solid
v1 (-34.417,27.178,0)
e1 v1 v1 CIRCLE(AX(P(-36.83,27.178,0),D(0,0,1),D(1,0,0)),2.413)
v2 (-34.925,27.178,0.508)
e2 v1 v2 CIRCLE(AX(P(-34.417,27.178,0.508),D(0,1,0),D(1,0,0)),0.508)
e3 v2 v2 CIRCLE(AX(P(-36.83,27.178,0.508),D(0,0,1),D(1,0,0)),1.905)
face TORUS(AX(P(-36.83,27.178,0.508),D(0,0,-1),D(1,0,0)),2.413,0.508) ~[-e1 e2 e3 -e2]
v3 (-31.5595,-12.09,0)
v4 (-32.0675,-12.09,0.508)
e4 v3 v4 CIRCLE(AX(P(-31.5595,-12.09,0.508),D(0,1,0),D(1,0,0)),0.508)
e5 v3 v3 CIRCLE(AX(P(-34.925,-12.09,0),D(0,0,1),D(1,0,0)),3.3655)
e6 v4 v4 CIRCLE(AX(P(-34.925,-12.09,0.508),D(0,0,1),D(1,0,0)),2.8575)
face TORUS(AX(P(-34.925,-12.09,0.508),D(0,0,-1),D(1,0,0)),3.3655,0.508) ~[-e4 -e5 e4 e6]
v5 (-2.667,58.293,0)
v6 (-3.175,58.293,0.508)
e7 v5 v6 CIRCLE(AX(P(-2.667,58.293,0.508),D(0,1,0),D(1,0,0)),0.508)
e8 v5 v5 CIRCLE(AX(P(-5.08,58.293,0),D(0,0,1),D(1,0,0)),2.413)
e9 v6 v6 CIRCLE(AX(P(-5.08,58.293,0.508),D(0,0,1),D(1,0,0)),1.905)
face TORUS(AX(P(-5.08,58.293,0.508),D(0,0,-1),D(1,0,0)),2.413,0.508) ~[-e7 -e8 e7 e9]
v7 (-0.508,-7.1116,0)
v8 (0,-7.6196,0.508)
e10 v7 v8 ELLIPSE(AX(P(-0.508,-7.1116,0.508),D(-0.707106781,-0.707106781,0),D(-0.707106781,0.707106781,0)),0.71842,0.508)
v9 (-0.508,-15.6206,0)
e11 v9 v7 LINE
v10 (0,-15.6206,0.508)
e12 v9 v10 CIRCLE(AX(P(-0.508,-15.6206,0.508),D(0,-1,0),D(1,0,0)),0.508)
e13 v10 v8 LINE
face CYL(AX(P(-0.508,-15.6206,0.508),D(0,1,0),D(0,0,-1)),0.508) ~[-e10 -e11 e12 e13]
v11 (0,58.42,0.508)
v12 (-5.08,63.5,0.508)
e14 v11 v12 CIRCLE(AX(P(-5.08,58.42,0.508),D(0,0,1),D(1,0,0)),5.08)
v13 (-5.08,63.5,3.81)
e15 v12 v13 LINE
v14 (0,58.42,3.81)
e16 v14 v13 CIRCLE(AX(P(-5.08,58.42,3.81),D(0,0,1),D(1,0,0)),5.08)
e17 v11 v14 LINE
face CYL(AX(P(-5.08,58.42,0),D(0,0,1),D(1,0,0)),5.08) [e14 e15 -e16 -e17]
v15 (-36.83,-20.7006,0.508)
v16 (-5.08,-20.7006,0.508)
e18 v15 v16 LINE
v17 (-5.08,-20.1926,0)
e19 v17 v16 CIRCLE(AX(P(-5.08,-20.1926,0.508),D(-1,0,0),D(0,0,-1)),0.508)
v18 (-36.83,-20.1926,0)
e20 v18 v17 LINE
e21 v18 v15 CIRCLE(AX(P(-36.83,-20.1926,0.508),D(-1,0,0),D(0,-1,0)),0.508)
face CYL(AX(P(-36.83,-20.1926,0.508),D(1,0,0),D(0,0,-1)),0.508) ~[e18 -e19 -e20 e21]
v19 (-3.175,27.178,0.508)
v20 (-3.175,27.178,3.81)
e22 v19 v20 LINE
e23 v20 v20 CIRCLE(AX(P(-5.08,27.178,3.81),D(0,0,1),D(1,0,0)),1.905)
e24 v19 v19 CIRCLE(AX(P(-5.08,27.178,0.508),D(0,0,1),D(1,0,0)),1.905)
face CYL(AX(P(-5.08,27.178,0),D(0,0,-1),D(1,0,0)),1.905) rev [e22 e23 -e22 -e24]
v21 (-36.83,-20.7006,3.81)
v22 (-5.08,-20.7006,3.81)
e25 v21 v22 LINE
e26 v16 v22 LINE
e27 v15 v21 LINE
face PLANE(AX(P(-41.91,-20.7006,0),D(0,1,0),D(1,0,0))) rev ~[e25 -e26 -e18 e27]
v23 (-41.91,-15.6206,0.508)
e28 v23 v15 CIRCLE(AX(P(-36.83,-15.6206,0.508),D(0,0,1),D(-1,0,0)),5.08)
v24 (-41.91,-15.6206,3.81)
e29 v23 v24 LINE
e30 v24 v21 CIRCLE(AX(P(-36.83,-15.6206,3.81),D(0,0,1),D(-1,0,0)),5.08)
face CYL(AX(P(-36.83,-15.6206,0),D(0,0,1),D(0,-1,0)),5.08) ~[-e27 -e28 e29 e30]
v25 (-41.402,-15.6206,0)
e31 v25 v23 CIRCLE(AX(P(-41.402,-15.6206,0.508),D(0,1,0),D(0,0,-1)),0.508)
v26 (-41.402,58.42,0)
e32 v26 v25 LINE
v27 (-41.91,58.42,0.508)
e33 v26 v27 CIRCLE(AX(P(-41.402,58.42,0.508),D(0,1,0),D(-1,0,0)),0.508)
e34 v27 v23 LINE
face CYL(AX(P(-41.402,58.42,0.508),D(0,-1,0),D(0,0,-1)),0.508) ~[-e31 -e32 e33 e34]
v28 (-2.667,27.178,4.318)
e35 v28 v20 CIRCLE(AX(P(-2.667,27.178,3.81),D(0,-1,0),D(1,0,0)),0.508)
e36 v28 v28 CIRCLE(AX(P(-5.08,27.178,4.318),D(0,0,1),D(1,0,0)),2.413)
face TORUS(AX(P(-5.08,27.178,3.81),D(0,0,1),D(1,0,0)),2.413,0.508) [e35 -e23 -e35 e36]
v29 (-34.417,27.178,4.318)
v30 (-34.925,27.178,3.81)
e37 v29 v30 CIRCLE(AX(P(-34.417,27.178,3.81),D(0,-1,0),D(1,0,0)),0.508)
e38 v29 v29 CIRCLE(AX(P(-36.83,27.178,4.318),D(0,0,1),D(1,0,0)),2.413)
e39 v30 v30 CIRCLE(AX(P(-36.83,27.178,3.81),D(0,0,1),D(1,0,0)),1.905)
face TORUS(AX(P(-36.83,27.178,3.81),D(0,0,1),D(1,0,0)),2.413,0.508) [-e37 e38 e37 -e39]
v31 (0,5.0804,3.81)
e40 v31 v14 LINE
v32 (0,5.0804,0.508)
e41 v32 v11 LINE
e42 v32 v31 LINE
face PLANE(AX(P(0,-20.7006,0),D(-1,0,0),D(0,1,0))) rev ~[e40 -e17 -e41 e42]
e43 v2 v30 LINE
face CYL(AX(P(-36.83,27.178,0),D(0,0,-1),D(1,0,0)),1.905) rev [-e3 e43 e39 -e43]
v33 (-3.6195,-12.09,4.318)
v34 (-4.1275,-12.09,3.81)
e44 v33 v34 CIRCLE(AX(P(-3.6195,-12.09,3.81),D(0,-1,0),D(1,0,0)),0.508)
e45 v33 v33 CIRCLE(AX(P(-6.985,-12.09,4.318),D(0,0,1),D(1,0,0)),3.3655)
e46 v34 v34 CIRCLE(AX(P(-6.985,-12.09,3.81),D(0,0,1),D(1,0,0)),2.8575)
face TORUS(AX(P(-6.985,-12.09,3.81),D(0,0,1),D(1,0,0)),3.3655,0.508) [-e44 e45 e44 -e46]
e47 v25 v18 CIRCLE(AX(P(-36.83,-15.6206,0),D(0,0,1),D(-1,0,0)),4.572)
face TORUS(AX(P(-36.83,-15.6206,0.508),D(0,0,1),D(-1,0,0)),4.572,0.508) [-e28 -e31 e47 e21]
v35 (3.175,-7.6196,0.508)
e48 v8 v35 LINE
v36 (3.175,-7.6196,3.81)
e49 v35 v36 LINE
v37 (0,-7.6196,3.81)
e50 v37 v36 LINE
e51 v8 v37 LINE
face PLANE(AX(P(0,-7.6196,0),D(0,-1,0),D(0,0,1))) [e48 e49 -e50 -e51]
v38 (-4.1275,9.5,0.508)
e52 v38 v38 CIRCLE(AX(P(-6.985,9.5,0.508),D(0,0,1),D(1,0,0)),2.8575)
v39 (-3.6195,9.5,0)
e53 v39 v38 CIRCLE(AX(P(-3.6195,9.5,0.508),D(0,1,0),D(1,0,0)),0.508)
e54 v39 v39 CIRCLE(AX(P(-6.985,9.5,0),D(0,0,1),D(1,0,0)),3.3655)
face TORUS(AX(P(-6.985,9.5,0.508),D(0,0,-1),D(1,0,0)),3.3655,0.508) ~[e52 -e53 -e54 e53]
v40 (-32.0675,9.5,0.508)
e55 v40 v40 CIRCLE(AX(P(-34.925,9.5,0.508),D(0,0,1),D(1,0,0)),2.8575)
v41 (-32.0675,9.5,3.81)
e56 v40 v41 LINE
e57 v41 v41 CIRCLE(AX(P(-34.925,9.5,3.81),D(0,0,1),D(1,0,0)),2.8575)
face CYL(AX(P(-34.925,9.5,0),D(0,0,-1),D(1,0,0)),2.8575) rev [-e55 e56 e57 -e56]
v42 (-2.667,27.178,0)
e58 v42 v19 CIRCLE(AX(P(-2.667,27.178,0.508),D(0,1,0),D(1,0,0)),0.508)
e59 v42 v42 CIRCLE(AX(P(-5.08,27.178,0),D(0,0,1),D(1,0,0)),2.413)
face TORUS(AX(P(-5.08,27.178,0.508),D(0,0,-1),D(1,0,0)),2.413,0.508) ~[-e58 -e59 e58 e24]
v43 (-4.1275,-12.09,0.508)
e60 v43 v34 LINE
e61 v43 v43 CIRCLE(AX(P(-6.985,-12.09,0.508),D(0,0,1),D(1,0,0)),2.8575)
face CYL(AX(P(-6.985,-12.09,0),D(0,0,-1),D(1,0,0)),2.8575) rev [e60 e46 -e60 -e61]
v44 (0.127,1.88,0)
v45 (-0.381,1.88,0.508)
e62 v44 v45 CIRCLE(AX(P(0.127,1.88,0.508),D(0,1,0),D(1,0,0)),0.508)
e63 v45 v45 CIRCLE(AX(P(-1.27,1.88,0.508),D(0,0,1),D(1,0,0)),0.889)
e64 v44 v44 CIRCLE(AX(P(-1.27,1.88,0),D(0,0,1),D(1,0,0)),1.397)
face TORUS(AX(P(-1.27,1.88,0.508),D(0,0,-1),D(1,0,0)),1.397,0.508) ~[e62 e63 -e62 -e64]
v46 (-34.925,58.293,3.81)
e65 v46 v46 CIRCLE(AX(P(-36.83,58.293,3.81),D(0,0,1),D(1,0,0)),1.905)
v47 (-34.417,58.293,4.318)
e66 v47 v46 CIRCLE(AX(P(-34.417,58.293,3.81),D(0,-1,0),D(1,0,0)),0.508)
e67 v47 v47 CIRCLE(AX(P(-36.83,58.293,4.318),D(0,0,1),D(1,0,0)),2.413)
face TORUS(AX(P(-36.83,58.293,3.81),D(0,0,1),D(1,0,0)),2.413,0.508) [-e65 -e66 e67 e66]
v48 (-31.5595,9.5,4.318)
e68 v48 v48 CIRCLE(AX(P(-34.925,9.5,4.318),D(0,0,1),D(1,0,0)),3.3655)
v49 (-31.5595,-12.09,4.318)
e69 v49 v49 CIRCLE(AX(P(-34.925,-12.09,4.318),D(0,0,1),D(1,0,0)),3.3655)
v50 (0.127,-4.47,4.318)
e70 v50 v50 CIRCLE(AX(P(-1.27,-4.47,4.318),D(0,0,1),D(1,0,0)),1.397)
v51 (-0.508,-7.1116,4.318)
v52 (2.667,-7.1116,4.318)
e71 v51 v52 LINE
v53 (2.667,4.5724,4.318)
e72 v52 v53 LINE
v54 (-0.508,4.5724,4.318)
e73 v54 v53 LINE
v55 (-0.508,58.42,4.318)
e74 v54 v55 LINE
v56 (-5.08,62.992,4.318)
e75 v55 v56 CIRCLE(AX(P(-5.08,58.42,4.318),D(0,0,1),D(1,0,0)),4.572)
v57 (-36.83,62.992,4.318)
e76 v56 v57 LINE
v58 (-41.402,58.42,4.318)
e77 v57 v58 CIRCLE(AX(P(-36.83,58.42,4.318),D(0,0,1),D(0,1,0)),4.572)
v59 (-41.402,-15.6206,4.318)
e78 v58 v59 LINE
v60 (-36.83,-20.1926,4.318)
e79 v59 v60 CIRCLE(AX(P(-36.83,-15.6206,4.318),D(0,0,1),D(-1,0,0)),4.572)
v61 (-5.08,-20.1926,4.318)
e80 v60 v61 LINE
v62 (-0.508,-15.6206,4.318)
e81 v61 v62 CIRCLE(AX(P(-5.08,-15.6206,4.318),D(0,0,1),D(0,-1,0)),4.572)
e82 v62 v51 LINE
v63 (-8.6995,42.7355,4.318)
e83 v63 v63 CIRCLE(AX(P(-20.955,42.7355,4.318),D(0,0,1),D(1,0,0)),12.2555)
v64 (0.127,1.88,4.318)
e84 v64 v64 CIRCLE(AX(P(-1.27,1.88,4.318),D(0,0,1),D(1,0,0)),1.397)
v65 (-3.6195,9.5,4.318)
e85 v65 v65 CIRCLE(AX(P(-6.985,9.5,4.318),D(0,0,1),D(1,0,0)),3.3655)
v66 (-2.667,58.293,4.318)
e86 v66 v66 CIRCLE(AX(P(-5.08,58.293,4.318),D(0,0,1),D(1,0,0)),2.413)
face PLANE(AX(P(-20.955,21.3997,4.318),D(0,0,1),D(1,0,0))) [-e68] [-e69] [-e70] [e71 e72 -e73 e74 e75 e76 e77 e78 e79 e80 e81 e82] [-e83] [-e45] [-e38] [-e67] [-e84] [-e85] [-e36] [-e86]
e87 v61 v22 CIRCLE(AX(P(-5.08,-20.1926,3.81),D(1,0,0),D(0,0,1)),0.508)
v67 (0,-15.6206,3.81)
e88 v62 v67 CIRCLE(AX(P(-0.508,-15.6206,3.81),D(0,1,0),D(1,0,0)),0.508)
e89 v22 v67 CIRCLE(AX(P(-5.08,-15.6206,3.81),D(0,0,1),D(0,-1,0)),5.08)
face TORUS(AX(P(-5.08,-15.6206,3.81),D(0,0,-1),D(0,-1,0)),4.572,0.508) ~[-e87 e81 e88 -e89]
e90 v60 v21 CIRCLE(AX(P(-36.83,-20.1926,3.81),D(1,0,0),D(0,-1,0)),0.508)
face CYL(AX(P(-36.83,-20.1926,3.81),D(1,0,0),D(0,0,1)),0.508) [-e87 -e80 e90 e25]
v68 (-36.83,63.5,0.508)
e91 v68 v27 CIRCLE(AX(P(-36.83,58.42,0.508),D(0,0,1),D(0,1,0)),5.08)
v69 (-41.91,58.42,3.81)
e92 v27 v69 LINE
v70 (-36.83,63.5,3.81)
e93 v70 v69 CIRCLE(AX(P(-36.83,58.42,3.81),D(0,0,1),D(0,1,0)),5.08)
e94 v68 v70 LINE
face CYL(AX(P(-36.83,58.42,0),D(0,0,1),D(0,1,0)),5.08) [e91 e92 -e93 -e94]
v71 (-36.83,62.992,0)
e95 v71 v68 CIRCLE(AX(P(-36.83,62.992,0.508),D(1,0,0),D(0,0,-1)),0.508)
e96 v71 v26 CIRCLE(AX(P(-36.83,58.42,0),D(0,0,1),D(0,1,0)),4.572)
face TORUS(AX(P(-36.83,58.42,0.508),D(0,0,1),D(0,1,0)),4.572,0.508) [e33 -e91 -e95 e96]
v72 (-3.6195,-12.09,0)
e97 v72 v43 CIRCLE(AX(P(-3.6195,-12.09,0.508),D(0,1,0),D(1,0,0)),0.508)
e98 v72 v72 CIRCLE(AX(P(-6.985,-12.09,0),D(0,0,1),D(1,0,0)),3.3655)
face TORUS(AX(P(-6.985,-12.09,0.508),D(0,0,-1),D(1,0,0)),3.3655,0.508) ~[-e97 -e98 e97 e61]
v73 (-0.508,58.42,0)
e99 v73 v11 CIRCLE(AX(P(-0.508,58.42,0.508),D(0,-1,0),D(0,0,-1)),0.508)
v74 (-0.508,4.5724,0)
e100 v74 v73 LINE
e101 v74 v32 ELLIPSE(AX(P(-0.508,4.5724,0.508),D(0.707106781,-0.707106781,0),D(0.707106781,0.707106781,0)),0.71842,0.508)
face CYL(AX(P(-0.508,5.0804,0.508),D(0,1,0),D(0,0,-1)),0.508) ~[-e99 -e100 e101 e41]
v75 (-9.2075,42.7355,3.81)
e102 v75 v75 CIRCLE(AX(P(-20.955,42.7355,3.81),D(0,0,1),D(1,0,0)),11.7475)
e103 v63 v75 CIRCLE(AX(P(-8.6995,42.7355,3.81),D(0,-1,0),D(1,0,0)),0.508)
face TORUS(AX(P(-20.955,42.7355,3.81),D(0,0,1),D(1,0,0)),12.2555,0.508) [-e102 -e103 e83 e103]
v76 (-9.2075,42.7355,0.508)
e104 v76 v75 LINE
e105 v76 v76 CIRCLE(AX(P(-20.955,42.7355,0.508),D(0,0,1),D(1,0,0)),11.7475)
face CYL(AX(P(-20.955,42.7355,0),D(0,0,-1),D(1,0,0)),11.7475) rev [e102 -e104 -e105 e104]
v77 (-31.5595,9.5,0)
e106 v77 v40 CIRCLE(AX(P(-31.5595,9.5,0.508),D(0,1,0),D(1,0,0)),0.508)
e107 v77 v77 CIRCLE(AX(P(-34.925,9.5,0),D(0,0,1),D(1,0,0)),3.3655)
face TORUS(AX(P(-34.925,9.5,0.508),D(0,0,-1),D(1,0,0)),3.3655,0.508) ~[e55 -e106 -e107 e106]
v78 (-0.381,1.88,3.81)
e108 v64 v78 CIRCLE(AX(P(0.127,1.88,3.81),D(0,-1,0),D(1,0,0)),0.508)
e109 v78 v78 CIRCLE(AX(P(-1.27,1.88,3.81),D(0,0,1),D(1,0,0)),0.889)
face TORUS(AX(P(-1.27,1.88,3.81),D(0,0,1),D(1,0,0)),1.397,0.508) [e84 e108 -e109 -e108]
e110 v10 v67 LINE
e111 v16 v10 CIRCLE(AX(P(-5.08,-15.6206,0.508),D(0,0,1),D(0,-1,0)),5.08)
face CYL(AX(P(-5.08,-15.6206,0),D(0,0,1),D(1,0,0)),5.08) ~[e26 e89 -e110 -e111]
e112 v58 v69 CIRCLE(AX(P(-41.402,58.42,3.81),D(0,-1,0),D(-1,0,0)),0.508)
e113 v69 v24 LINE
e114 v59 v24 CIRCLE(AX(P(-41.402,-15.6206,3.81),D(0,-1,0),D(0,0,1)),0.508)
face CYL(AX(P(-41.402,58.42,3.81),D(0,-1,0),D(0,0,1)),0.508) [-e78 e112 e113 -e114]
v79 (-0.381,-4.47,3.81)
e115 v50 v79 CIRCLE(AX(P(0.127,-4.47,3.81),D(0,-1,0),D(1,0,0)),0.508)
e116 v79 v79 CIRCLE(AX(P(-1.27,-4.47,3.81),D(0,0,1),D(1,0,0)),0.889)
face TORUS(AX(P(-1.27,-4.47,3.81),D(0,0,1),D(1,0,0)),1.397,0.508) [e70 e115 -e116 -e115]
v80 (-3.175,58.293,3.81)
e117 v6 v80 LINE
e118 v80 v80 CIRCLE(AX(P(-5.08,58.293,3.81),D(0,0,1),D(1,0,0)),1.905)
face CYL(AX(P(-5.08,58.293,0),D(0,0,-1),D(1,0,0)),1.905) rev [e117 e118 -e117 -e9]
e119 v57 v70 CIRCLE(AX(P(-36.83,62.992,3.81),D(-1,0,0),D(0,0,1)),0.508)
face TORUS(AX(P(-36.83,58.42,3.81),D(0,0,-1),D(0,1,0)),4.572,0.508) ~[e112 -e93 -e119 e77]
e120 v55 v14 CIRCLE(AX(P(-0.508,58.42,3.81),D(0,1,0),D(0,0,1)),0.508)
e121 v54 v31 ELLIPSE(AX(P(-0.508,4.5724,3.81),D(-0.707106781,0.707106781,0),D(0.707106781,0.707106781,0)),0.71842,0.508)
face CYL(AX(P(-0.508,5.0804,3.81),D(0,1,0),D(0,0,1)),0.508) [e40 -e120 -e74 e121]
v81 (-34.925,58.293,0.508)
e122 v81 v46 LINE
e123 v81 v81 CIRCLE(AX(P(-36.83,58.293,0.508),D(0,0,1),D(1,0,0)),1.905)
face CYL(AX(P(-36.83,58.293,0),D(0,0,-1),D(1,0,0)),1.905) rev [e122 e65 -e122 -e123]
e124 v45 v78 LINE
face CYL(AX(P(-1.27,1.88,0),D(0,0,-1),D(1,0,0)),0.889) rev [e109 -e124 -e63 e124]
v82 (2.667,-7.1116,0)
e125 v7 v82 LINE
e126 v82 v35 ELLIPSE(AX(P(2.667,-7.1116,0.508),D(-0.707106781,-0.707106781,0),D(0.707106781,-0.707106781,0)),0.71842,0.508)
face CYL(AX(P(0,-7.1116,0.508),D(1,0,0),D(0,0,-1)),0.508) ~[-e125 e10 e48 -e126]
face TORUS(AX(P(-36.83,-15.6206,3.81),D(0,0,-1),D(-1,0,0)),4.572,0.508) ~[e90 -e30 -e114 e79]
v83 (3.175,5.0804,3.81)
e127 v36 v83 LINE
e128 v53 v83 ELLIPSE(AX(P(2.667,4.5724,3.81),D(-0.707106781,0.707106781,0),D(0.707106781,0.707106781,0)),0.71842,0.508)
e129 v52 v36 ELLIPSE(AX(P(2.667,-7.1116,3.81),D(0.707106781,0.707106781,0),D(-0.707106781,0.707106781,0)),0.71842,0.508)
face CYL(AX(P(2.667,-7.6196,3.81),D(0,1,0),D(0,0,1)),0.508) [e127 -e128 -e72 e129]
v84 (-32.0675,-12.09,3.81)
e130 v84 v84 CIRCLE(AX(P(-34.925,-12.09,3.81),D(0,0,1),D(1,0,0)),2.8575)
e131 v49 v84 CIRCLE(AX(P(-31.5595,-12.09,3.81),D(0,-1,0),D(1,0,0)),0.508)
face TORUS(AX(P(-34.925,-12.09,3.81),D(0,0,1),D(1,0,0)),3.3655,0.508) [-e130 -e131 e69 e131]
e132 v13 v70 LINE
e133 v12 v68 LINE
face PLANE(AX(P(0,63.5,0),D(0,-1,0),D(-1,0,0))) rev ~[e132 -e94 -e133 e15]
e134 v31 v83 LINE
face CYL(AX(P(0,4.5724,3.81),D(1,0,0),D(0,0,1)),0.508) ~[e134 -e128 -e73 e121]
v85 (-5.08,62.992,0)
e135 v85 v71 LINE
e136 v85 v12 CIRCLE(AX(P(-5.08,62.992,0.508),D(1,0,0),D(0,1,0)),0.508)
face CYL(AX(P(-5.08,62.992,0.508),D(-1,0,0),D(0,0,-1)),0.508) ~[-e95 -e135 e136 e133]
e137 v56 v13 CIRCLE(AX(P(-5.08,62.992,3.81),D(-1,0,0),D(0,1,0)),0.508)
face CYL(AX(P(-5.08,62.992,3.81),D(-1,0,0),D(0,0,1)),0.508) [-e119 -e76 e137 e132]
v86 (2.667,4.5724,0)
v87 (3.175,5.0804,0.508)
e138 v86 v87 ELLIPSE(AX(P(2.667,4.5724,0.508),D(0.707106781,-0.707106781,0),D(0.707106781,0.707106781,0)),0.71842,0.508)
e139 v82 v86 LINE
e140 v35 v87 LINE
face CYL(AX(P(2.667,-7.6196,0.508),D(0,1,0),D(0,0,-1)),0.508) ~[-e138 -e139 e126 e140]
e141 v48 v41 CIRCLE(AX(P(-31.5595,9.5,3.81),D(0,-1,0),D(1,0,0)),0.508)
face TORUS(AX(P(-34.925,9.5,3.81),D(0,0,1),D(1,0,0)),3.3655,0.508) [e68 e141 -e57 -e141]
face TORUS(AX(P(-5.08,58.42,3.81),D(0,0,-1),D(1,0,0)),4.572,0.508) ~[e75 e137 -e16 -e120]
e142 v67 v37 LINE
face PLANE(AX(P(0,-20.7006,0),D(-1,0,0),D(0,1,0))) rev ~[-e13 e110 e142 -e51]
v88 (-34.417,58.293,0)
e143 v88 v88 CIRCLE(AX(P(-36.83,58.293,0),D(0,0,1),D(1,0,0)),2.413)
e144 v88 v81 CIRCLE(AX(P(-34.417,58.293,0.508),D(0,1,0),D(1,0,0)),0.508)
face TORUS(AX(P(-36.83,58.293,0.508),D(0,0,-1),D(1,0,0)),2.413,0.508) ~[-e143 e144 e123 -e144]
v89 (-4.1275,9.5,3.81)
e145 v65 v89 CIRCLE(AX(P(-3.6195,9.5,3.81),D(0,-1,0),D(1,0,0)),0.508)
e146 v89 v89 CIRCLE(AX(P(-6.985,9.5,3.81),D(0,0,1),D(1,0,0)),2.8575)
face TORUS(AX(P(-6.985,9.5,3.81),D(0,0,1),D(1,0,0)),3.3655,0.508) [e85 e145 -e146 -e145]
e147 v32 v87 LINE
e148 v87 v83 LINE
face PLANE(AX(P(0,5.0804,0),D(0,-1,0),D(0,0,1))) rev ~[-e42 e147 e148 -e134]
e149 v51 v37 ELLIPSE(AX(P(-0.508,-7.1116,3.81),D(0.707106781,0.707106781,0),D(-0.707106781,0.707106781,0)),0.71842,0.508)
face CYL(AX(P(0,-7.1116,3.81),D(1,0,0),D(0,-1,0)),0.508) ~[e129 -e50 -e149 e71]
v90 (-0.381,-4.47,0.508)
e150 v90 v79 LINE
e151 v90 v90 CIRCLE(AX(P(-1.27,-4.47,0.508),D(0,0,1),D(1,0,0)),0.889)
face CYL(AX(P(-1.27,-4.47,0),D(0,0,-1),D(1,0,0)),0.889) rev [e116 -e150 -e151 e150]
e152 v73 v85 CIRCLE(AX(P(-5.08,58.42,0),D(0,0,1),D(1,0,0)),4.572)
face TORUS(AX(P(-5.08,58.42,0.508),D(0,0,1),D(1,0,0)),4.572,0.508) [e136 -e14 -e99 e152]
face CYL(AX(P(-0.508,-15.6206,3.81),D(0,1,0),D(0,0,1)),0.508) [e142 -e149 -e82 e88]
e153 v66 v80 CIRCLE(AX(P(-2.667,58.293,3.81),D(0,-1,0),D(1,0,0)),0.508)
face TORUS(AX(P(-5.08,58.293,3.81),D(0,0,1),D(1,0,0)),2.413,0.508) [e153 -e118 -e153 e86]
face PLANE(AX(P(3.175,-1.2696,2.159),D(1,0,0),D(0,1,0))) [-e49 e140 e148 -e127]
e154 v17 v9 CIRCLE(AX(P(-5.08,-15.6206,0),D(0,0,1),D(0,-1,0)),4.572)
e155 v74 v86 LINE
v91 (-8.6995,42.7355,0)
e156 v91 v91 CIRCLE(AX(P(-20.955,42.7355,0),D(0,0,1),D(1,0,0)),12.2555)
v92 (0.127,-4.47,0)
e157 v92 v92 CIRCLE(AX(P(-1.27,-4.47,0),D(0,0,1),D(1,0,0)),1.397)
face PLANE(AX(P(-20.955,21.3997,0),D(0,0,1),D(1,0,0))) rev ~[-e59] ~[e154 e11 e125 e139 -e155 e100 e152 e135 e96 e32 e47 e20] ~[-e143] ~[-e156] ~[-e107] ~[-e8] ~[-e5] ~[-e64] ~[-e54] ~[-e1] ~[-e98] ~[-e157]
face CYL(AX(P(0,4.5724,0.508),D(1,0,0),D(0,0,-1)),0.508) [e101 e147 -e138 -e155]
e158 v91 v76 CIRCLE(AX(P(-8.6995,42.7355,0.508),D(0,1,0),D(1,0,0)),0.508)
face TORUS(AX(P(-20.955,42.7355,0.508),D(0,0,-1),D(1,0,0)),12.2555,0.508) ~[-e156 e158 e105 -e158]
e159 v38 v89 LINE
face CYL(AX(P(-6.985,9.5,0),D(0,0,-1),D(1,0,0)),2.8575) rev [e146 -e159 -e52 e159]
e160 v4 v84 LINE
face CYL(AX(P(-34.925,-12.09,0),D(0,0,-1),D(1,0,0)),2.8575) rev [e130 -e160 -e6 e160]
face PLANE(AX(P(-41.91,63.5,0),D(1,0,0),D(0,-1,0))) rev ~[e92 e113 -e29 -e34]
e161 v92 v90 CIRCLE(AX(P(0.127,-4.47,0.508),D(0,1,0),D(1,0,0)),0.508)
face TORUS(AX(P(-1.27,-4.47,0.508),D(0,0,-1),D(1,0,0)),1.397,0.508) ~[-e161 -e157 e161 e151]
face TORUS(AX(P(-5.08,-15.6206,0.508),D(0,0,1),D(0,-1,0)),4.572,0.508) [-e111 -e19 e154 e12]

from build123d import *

# Parameters (mm, degrees)
F0_R     = 2.8575
F0_R_2   = 0.889
F0_R_3   = 1.905
F0_R_4   = 11.7475
F1_DEPTH = 4.318
F2_W     = 12.7
F2_H     = 4.318
F3_DEPTH = 3.175
F4_R     = 5.08
F5_R     = 0.508


# Not quite as in the source:
# - a feature names something its author has since deleted; it is built from what else it names


with BuildPart() as f1:
    # F0 (on Top) → F1 (new body)
    with BuildSketch(Plane.XY):
        Polygon((0, -20.7006), (0, 0), (0, 63.5), (-41.91, 63.5), (-41.91, 19), (-41.91, 0), (-41.91, -20.7006), align=None)
        with Locations((-34.925, -12.09)):
            Circle(F0_R, mode=Mode.SUBTRACT)
        with Locations((-34.925, 9.5)):
            Circle(F0_R, mode=Mode.SUBTRACT)
        with Locations((-6.985, -12.09)):
            Circle(F0_R, mode=Mode.SUBTRACT)
        with Locations((-1.27, -4.47)):
            Circle(F0_R_2, mode=Mode.SUBTRACT)
        with Locations((-6.985, 9.5)):
            Circle(F0_R, mode=Mode.SUBTRACT)
        with Locations((-1.27, 1.88)):
            Circle(F0_R_2, mode=Mode.SUBTRACT)
        with Locations((-36.83, 27.178)):
            Circle(F0_R_3, mode=Mode.SUBTRACT)
        with Locations((-36.83, 58.293)):
            Circle(F0_R_3, mode=Mode.SUBTRACT)
        with Locations((-5.08, 27.178)):
            Circle(F0_R_3, mode=Mode.SUBTRACT)
        with Locations((-20.955, 42.7355)):
            Circle(F0_R_4, mode=Mode.SUBTRACT)
        with Locations((-5.08, 58.293)):
            Circle(F0_R_3, mode=Mode.SUBTRACT)
    extrude(amount=F1_DEPTH)

    # F2 (on face) → F3 (join)
    with BuildSketch(Plane.YZ):
        with Locations((-1.2696, 2.159)):
            Rectangle(F2_W, F2_H)
    extrude(amount=F3_DEPTH)

    # F4
    f4_edges = [f1.edges().sort_by_distance(p)[0] for p in [
        (0, 63.5, 2.159),
        (-41.91, 63.5, 2.159),
        (0, -20.7006, 2.159),
        (-41.91, -20.7006, 2.159),
    ]]
    fillet(f4_edges, radius=F4_R)

    # F5
    f5_edges = [f1.edges().sort_by_distance(p)[0] for p in [
        (0, 31.7502, 4.318),
        (-37.7825, 9.5, 4.318),
        (-32.7025, 42.7355, 4.318),
        (0, 31.7502, 0),
        (-37.7825, 9.5, 0),
        (-37.7825, -12.09, 4.318),
        (-37.7825, -12.09, 0),
        (-32.7025, 42.7355, 0),
        (-1.487898, 62.012102, 4.318),
        (1.5875, 5.0804, 4.318),
        (-20.955, 63.5, 4.318),
        (3.175, -1.2696, 4.318),
        (-40.422102, 62.012102, 4.318),
        (1.5875, -7.6196, 4.318),
        (-41.91, 21.3997, 4.318),
        (0, -11.6201, 4.318),
        (-40.422102, -19.212702, 4.318),
        (-1.487898, -19.212702, 4.318),
        (-20.955, -20.7006, 4.318),
        (-9.8425, -12.09, 4.318),
        (-2.159, -4.47, 4.318),
        (-9.8425, 9.5, 4.318),
        (-2.159, 1.88, 4.318),
        (-38.735, 27.178, 4.318),
        (-38.735, 58.293, 4.318),
        (-6.985, 27.178, 4.318),
        (-6.985, 58.293, 4.318),
        (0, -11.6201, 0),
        (-1.487898, -19.212702, 0),
        (1.5875, -7.6196, 0),
        (-20.955, -20.7006, 0),
        (3.175, -1.2696, 0),
        (-40.422102, -19.212702, 0),
        (1.5875, 5.0804, 0),
        (-41.91, 21.3997, 0),
        (-40.422102, 62.012102, 0),
        (-1.487898, 62.012102, 0),
        (-20.955, 63.5, 0),
        (-9.8425, -12.09, 0),
        (-2.159, -4.47, 0),
        (-9.8425, 9.5, 0),
        (-2.159, 1.88, 0),
        (-38.735, 27.178, 0),
        (-38.735, 58.293, 0),
        (-6.985, 27.178, 0),
        (-6.985, 58.293, 0),
    ]]
    fillet(f5_edges, radius=F5_R)


solid = f1.part
